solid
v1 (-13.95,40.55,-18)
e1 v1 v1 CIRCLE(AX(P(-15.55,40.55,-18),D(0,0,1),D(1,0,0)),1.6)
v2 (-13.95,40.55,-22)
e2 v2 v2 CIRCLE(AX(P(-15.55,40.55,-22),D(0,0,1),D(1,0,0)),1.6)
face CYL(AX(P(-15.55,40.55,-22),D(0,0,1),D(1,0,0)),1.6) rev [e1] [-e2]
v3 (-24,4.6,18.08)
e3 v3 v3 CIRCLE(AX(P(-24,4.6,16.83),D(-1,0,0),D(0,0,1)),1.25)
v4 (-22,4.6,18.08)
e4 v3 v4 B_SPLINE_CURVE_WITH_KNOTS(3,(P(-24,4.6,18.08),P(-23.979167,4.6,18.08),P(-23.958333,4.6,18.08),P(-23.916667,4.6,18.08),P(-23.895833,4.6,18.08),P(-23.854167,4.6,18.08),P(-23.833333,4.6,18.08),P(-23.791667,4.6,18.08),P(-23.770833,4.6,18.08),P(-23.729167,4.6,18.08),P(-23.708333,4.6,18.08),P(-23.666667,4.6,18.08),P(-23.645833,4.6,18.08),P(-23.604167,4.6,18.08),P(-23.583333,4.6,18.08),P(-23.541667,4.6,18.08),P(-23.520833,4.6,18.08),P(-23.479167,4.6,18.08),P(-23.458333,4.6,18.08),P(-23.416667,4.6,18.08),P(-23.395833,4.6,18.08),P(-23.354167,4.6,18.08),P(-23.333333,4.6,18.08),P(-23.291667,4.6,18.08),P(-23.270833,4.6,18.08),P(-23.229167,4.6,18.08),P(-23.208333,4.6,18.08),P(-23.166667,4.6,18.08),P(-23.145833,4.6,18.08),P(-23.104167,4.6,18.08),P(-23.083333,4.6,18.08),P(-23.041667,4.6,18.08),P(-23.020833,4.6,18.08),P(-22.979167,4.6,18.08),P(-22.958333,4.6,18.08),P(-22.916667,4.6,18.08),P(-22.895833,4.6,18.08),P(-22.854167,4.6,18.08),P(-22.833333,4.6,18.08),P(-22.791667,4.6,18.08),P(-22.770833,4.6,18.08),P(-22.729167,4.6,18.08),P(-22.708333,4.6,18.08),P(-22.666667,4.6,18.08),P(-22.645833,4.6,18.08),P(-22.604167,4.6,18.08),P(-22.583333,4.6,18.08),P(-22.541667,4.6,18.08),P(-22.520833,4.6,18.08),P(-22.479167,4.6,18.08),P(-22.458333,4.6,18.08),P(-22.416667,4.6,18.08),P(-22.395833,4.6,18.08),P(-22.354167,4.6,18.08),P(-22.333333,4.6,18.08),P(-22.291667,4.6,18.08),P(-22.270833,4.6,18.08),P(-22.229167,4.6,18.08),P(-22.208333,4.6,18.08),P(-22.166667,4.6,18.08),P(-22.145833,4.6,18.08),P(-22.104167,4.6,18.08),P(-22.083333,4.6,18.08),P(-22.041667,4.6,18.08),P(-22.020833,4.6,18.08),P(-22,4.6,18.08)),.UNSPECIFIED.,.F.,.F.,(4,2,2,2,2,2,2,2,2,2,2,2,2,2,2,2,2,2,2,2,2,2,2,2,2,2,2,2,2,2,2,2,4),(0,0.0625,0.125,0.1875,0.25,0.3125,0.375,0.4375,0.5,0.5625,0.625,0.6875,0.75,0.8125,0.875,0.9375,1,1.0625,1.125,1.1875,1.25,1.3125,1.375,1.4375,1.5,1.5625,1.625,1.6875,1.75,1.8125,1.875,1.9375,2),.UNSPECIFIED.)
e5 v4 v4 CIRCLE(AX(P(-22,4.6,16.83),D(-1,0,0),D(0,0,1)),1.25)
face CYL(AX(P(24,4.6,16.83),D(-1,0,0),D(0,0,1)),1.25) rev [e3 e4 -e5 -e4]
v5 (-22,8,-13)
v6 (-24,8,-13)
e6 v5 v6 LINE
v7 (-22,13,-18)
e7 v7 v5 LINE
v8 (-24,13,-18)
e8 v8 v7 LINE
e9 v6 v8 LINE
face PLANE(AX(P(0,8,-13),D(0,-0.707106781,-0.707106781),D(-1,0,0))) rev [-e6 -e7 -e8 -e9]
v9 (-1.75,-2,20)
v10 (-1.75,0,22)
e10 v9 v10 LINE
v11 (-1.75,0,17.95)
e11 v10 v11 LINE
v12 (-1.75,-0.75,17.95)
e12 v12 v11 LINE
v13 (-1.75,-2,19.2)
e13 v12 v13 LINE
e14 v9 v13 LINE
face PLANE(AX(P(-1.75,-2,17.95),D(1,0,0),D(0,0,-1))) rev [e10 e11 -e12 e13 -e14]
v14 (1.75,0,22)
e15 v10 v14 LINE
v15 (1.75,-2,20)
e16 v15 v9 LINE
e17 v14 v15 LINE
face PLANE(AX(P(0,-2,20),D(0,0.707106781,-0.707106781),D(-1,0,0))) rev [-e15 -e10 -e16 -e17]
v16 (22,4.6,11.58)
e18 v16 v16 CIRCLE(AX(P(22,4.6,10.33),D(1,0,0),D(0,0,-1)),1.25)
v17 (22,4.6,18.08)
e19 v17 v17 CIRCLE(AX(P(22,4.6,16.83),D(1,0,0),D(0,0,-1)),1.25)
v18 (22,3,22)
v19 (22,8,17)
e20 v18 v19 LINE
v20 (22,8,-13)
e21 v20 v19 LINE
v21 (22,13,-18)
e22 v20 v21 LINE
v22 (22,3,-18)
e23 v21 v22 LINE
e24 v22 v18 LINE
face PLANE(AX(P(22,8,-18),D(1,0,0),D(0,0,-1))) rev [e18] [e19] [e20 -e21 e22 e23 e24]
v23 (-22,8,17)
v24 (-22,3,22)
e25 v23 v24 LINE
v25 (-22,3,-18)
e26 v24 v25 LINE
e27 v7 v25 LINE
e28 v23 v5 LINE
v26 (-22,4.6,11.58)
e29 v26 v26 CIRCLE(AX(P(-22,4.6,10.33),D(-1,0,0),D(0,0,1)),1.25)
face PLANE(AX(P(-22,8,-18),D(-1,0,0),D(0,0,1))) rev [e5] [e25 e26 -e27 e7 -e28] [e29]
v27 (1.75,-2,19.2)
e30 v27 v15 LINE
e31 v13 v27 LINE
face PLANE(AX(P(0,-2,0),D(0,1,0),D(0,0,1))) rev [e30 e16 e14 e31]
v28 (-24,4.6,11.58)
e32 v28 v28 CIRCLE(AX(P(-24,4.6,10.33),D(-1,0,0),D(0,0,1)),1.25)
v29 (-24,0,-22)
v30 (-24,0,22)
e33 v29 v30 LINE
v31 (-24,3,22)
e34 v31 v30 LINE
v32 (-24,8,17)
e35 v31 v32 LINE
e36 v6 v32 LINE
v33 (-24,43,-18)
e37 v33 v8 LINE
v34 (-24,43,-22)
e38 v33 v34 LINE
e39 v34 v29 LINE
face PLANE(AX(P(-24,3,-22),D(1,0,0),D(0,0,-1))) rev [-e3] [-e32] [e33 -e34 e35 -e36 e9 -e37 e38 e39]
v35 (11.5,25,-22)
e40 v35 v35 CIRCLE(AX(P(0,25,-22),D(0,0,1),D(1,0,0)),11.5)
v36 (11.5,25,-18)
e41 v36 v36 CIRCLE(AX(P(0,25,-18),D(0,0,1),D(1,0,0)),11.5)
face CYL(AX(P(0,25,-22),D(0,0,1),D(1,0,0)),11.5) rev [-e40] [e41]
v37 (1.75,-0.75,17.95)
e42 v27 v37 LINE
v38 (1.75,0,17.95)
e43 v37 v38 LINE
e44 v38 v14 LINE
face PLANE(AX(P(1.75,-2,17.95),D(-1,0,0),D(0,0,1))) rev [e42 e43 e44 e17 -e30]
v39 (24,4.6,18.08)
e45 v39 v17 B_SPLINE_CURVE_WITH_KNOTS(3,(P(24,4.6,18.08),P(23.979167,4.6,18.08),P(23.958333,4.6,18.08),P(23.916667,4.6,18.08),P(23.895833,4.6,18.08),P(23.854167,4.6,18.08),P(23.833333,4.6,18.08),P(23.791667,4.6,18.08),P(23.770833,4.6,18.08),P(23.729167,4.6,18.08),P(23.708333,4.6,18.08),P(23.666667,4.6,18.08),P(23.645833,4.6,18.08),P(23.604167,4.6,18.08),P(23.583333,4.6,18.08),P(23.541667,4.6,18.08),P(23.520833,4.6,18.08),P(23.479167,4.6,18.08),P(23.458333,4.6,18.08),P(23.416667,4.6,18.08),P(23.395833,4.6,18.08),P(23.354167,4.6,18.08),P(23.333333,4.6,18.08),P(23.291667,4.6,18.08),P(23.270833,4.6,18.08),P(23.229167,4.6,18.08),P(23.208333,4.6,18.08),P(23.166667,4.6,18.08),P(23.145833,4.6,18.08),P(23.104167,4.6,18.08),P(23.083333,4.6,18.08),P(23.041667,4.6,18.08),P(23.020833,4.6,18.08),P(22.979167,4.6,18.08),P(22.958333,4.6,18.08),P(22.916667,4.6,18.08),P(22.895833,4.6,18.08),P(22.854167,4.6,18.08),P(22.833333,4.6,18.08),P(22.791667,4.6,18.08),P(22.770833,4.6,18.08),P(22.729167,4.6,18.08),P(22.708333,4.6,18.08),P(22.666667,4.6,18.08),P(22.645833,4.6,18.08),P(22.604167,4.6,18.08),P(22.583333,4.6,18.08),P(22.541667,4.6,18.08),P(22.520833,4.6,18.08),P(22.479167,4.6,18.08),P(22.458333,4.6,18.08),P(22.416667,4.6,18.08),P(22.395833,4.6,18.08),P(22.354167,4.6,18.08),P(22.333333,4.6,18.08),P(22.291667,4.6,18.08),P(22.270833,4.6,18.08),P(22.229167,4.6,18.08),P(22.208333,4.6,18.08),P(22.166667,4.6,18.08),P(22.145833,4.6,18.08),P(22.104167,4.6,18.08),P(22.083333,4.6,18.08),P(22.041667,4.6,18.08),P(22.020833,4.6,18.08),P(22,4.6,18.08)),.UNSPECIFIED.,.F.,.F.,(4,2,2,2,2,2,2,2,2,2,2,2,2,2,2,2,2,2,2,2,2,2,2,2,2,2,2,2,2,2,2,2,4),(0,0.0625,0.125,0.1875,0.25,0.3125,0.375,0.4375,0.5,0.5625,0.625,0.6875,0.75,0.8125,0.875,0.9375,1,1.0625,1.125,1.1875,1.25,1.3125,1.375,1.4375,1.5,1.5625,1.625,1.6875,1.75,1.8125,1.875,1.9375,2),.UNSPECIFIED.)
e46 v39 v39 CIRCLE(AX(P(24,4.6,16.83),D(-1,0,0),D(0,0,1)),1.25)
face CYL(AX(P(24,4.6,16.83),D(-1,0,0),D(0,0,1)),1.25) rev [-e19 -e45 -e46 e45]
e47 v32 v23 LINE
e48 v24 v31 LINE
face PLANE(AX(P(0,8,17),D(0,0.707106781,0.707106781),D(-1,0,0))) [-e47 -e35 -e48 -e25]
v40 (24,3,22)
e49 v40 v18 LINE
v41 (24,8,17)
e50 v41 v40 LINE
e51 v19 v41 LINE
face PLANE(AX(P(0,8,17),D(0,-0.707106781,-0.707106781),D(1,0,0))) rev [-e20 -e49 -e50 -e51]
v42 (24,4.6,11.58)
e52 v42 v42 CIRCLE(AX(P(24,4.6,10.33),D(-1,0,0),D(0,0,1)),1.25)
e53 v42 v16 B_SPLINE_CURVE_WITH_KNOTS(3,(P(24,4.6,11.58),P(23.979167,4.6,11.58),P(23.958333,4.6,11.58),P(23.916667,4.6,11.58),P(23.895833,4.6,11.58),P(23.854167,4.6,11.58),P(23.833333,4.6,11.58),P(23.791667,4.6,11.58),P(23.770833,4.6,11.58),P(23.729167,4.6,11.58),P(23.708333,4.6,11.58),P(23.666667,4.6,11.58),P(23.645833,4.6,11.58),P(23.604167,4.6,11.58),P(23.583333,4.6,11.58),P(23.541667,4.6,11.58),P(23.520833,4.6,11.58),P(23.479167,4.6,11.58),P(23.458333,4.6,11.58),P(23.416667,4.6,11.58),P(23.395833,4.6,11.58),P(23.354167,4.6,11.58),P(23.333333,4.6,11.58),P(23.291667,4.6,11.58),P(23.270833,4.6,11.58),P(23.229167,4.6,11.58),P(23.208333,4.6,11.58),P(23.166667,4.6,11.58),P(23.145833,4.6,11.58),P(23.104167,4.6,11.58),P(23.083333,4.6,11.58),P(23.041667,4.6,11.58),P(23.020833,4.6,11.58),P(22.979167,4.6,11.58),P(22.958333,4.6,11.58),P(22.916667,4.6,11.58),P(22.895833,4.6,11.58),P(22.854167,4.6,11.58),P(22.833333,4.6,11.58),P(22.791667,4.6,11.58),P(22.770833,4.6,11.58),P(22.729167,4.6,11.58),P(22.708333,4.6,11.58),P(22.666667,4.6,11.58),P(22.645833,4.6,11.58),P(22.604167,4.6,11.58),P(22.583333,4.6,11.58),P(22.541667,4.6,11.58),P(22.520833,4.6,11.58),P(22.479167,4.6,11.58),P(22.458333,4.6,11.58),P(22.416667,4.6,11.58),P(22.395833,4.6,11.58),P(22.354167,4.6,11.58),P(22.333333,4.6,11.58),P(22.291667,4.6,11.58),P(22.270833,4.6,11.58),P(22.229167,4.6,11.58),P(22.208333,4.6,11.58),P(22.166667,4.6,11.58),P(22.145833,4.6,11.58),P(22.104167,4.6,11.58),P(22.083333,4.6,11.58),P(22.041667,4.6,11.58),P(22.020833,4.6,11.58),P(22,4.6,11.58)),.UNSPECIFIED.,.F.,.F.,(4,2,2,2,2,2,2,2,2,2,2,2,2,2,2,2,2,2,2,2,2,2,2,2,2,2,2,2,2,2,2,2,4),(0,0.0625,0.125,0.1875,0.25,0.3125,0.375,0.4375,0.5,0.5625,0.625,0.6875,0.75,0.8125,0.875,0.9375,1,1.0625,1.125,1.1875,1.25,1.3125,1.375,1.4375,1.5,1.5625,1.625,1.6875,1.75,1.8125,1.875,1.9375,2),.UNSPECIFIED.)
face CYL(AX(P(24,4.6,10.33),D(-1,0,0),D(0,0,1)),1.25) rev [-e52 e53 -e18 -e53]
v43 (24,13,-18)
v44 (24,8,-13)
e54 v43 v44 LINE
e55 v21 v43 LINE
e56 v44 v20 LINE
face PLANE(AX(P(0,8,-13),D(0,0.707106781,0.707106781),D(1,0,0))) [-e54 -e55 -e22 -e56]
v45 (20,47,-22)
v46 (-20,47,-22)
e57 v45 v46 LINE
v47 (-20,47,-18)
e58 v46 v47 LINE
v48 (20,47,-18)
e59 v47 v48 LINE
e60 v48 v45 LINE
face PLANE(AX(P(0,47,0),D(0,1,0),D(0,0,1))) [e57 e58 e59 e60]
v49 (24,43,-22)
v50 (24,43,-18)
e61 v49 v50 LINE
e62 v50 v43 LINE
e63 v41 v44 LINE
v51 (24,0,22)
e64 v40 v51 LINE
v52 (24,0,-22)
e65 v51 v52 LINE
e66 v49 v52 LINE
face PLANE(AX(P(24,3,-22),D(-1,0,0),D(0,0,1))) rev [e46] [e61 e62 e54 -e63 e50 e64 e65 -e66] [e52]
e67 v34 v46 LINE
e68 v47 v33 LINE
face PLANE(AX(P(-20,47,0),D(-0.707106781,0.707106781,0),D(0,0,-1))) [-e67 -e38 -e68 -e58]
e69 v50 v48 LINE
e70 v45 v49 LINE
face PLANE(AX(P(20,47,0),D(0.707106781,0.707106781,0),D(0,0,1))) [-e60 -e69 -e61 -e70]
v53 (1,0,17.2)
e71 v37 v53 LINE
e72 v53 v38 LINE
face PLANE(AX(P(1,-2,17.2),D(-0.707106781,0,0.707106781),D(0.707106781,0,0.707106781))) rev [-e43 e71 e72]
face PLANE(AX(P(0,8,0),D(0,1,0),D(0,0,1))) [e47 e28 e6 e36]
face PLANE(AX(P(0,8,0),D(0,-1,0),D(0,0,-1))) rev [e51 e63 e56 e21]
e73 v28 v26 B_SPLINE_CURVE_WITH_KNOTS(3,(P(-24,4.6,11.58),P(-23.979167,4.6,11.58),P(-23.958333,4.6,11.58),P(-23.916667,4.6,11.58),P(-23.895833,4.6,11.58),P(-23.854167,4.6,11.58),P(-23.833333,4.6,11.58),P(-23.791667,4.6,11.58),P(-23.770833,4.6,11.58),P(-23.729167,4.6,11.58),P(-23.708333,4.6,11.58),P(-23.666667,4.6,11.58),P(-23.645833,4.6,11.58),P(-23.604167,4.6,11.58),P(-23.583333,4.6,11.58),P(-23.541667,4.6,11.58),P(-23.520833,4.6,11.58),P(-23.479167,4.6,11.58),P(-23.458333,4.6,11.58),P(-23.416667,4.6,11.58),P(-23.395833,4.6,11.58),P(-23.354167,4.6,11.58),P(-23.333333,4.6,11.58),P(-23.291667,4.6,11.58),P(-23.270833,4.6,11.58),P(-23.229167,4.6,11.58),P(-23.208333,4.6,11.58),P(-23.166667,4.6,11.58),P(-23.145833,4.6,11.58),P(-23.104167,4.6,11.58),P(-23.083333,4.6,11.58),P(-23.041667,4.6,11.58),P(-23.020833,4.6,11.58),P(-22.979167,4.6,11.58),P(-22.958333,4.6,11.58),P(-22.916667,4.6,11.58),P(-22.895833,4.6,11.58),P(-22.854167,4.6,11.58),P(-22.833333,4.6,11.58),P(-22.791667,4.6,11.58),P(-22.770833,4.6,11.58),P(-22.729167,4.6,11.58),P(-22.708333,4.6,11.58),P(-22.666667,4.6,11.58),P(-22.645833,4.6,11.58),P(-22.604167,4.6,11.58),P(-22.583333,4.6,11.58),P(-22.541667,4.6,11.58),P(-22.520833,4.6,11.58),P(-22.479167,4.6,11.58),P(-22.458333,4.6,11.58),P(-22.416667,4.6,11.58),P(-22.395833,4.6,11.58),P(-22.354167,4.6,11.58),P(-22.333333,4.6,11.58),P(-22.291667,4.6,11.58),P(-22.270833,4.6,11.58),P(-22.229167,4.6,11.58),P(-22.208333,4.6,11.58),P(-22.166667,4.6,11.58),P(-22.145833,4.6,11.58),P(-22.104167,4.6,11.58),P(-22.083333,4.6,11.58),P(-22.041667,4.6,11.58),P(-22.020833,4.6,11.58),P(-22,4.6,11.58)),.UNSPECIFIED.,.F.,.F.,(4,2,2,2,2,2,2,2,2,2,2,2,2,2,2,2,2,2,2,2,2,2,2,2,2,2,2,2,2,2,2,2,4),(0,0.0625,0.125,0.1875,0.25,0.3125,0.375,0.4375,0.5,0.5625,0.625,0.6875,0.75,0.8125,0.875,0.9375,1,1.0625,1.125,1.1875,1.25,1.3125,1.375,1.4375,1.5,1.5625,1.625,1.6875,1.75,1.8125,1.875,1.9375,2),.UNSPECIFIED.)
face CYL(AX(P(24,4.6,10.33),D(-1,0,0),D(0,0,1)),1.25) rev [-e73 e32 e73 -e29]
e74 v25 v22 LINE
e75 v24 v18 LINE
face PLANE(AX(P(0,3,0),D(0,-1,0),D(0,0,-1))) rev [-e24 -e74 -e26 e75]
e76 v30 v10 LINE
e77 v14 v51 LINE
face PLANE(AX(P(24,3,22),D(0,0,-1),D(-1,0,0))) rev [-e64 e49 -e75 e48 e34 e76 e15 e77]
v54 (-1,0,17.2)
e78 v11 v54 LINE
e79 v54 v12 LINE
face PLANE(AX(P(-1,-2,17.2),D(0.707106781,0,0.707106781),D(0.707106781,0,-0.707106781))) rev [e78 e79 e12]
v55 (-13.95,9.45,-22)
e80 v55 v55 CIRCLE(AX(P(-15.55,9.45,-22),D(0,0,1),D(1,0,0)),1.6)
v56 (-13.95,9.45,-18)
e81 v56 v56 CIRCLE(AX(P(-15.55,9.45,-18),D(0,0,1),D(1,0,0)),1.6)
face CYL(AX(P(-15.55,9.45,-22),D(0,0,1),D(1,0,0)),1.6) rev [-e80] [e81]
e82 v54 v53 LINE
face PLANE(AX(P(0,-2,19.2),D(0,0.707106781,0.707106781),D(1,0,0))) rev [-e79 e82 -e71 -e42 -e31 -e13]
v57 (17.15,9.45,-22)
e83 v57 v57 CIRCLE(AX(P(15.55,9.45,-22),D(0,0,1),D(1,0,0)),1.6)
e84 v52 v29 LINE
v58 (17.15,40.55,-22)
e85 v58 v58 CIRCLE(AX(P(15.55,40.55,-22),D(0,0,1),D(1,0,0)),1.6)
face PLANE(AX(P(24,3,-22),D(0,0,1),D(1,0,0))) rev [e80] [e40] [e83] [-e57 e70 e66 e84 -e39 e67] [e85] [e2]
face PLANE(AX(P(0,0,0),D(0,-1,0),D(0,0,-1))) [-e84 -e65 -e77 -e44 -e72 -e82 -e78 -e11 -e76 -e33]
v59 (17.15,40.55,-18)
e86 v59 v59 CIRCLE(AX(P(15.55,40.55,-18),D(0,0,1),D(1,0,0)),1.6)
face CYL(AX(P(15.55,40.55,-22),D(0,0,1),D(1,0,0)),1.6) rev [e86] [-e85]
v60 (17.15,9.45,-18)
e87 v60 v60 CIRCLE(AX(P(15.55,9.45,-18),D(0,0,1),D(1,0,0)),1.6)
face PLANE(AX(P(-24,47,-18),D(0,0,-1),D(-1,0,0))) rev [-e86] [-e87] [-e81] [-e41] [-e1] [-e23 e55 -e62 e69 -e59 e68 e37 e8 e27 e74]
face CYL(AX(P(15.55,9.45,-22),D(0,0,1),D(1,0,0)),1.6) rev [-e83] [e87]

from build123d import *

# Parameters (mm, degrees)
SKIZZE1_W                       = 48
SKIZZE1_H                       = 44
AUFSATZ_LINEAR_AUSTRAGEN1_DEPTH = 3
SKIZZE2_W                       = 48
SKIZZE2_H                       = 4
AUFSATZ_LINEAR_AUSTRAGEN2_DEPTH = 44
SKIZZE3_R                       = 11.5
SKIZZE3_R_2                     = 1.6
SCHNITT_LINEAR_AUSTRAGEN1_DEPTH = 67.219332525
SKIZZE5_W                       = 2
SKIZZE5_H                       = 40
AUFSATZ_LINEAR_AUSTRAGEN3_DEPTH = 5
FASE2_SIZE                      = 5
FASE3_SIZE                      = 4
AUFSATZ_LINEAR_AUSTRAGEN4_DEPTH = 2
FASE4_SIZE                      = 2
SKIZZE8_R                       = 1.25
SCHNITT_LINEAR_AUSTRAGEN2_DEPTH = 71.689461732


with BuildPart() as part:
    # Skizze1 → Aufsatz-Linear austragen1 (new body)
    with BuildSketch(Plane(origin=(0, 0, 0), x_dir=(1, 0, 0), z_dir=(0, 1, 0))):
        Rectangle(SKIZZE1_W, SKIZZE1_H)
    extrude(amount=AUFSATZ_LINEAR_AUSTRAGEN1_DEPTH)

    # Skizze2 → Aufsatz-Linear austragen2 (add)
    with BuildSketch(Plane(origin=(0, 3, 0), x_dir=(1, 0, 0), z_dir=(0, 1, 0))):
        with Locations((0, 20)):
            Rectangle(SKIZZE2_W, SKIZZE2_H)
    extrude(amount=AUFSATZ_LINEAR_AUSTRAGEN2_DEPTH)

    # Skizze3 → Schnitt-Linear austragen1 (cut, through all)
    with BuildSketch(Plane.XY.offset(-18)):
        with Locations((0, 25)):
            Circle(SKIZZE3_R)
        with Locations((-15.55, 40.55)):
            Circle(SKIZZE3_R_2)
        with Locations((15.55, 40.55)):
            Circle(SKIZZE3_R_2)
        with Locations((15.55, 9.45)):
            Circle(SKIZZE3_R_2)
        with Locations((-15.55, 9.45)):
            Circle(SKIZZE3_R_2)
    extrude(amount=-SCHNITT_LINEAR_AUSTRAGEN1_DEPTH, mode=Mode.SUBTRACT)

    # Skizze5 → Aufsatz-Linear austragen3 (add)
    with BuildSketch(Plane(origin=(0, 3, 0), x_dir=(1, 0, 0), z_dir=(0, 1, 0))):
        with Locations((-23, -2)):
            Rectangle(SKIZZE5_W, SKIZZE5_H)
        with Locations((23, -2)):
            Rectangle(SKIZZE5_W, SKIZZE5_H)
    extrude(amount=AUFSATZ_LINEAR_AUSTRAGEN3_DEPTH)

    # Fase2
    fase2_edges = [part.edges().sort_by_distance(p)[0] for p in [
        (23, 8, -18),
        (-23, 8, 22),
        (-23, 8, -18),
        (23, 8, 22),
    ]]
    chamfer(fase2_edges, length=FASE2_SIZE)

    # Fase3
    fase3_edges = [part.edges().sort_by_distance(p)[0] for p in [
        (-24, 47, -20),
        (24, 47, -20),
    ]]
    chamfer(fase3_edges, length=FASE3_SIZE)

    # Skizze7 → Aufsatz-Linear austragen4 (add)
    with BuildSketch(Plane.XZ):
        Polygon((-1.75, 22), (1.75, 22), (1.75, 17.95), (1, 17.2), (-1, 17.2), (-1.75, 17.95), align=None)
    extrude(amount=AUFSATZ_LINEAR_AUSTRAGEN4_DEPTH)

    # Fase4
    fase4_edges = [part.edges().sort_by_distance(p)[0] for p in [
        (0, -2, 17.2),
        (0, -2, 22),
    ]]
    chamfer(fase4_edges, length=FASE4_SIZE - 0.0001)  # a hair under: the kernel refuses the full size

    # Skizze8 → Schnitt-Linear austragen2 (cut, through all)
    with BuildSketch(Plane.ZY.offset(24)):
        with Locations((16.83, 4.6)):
            Circle(SKIZZE8_R)
        with Locations((10.33, 4.6)):
            Circle(SKIZZE8_R)
    extrude(amount=-SCHNITT_LINEAR_AUSTRAGEN2_DEPTH, mode=Mode.SUBTRACT)


solid = part.part
